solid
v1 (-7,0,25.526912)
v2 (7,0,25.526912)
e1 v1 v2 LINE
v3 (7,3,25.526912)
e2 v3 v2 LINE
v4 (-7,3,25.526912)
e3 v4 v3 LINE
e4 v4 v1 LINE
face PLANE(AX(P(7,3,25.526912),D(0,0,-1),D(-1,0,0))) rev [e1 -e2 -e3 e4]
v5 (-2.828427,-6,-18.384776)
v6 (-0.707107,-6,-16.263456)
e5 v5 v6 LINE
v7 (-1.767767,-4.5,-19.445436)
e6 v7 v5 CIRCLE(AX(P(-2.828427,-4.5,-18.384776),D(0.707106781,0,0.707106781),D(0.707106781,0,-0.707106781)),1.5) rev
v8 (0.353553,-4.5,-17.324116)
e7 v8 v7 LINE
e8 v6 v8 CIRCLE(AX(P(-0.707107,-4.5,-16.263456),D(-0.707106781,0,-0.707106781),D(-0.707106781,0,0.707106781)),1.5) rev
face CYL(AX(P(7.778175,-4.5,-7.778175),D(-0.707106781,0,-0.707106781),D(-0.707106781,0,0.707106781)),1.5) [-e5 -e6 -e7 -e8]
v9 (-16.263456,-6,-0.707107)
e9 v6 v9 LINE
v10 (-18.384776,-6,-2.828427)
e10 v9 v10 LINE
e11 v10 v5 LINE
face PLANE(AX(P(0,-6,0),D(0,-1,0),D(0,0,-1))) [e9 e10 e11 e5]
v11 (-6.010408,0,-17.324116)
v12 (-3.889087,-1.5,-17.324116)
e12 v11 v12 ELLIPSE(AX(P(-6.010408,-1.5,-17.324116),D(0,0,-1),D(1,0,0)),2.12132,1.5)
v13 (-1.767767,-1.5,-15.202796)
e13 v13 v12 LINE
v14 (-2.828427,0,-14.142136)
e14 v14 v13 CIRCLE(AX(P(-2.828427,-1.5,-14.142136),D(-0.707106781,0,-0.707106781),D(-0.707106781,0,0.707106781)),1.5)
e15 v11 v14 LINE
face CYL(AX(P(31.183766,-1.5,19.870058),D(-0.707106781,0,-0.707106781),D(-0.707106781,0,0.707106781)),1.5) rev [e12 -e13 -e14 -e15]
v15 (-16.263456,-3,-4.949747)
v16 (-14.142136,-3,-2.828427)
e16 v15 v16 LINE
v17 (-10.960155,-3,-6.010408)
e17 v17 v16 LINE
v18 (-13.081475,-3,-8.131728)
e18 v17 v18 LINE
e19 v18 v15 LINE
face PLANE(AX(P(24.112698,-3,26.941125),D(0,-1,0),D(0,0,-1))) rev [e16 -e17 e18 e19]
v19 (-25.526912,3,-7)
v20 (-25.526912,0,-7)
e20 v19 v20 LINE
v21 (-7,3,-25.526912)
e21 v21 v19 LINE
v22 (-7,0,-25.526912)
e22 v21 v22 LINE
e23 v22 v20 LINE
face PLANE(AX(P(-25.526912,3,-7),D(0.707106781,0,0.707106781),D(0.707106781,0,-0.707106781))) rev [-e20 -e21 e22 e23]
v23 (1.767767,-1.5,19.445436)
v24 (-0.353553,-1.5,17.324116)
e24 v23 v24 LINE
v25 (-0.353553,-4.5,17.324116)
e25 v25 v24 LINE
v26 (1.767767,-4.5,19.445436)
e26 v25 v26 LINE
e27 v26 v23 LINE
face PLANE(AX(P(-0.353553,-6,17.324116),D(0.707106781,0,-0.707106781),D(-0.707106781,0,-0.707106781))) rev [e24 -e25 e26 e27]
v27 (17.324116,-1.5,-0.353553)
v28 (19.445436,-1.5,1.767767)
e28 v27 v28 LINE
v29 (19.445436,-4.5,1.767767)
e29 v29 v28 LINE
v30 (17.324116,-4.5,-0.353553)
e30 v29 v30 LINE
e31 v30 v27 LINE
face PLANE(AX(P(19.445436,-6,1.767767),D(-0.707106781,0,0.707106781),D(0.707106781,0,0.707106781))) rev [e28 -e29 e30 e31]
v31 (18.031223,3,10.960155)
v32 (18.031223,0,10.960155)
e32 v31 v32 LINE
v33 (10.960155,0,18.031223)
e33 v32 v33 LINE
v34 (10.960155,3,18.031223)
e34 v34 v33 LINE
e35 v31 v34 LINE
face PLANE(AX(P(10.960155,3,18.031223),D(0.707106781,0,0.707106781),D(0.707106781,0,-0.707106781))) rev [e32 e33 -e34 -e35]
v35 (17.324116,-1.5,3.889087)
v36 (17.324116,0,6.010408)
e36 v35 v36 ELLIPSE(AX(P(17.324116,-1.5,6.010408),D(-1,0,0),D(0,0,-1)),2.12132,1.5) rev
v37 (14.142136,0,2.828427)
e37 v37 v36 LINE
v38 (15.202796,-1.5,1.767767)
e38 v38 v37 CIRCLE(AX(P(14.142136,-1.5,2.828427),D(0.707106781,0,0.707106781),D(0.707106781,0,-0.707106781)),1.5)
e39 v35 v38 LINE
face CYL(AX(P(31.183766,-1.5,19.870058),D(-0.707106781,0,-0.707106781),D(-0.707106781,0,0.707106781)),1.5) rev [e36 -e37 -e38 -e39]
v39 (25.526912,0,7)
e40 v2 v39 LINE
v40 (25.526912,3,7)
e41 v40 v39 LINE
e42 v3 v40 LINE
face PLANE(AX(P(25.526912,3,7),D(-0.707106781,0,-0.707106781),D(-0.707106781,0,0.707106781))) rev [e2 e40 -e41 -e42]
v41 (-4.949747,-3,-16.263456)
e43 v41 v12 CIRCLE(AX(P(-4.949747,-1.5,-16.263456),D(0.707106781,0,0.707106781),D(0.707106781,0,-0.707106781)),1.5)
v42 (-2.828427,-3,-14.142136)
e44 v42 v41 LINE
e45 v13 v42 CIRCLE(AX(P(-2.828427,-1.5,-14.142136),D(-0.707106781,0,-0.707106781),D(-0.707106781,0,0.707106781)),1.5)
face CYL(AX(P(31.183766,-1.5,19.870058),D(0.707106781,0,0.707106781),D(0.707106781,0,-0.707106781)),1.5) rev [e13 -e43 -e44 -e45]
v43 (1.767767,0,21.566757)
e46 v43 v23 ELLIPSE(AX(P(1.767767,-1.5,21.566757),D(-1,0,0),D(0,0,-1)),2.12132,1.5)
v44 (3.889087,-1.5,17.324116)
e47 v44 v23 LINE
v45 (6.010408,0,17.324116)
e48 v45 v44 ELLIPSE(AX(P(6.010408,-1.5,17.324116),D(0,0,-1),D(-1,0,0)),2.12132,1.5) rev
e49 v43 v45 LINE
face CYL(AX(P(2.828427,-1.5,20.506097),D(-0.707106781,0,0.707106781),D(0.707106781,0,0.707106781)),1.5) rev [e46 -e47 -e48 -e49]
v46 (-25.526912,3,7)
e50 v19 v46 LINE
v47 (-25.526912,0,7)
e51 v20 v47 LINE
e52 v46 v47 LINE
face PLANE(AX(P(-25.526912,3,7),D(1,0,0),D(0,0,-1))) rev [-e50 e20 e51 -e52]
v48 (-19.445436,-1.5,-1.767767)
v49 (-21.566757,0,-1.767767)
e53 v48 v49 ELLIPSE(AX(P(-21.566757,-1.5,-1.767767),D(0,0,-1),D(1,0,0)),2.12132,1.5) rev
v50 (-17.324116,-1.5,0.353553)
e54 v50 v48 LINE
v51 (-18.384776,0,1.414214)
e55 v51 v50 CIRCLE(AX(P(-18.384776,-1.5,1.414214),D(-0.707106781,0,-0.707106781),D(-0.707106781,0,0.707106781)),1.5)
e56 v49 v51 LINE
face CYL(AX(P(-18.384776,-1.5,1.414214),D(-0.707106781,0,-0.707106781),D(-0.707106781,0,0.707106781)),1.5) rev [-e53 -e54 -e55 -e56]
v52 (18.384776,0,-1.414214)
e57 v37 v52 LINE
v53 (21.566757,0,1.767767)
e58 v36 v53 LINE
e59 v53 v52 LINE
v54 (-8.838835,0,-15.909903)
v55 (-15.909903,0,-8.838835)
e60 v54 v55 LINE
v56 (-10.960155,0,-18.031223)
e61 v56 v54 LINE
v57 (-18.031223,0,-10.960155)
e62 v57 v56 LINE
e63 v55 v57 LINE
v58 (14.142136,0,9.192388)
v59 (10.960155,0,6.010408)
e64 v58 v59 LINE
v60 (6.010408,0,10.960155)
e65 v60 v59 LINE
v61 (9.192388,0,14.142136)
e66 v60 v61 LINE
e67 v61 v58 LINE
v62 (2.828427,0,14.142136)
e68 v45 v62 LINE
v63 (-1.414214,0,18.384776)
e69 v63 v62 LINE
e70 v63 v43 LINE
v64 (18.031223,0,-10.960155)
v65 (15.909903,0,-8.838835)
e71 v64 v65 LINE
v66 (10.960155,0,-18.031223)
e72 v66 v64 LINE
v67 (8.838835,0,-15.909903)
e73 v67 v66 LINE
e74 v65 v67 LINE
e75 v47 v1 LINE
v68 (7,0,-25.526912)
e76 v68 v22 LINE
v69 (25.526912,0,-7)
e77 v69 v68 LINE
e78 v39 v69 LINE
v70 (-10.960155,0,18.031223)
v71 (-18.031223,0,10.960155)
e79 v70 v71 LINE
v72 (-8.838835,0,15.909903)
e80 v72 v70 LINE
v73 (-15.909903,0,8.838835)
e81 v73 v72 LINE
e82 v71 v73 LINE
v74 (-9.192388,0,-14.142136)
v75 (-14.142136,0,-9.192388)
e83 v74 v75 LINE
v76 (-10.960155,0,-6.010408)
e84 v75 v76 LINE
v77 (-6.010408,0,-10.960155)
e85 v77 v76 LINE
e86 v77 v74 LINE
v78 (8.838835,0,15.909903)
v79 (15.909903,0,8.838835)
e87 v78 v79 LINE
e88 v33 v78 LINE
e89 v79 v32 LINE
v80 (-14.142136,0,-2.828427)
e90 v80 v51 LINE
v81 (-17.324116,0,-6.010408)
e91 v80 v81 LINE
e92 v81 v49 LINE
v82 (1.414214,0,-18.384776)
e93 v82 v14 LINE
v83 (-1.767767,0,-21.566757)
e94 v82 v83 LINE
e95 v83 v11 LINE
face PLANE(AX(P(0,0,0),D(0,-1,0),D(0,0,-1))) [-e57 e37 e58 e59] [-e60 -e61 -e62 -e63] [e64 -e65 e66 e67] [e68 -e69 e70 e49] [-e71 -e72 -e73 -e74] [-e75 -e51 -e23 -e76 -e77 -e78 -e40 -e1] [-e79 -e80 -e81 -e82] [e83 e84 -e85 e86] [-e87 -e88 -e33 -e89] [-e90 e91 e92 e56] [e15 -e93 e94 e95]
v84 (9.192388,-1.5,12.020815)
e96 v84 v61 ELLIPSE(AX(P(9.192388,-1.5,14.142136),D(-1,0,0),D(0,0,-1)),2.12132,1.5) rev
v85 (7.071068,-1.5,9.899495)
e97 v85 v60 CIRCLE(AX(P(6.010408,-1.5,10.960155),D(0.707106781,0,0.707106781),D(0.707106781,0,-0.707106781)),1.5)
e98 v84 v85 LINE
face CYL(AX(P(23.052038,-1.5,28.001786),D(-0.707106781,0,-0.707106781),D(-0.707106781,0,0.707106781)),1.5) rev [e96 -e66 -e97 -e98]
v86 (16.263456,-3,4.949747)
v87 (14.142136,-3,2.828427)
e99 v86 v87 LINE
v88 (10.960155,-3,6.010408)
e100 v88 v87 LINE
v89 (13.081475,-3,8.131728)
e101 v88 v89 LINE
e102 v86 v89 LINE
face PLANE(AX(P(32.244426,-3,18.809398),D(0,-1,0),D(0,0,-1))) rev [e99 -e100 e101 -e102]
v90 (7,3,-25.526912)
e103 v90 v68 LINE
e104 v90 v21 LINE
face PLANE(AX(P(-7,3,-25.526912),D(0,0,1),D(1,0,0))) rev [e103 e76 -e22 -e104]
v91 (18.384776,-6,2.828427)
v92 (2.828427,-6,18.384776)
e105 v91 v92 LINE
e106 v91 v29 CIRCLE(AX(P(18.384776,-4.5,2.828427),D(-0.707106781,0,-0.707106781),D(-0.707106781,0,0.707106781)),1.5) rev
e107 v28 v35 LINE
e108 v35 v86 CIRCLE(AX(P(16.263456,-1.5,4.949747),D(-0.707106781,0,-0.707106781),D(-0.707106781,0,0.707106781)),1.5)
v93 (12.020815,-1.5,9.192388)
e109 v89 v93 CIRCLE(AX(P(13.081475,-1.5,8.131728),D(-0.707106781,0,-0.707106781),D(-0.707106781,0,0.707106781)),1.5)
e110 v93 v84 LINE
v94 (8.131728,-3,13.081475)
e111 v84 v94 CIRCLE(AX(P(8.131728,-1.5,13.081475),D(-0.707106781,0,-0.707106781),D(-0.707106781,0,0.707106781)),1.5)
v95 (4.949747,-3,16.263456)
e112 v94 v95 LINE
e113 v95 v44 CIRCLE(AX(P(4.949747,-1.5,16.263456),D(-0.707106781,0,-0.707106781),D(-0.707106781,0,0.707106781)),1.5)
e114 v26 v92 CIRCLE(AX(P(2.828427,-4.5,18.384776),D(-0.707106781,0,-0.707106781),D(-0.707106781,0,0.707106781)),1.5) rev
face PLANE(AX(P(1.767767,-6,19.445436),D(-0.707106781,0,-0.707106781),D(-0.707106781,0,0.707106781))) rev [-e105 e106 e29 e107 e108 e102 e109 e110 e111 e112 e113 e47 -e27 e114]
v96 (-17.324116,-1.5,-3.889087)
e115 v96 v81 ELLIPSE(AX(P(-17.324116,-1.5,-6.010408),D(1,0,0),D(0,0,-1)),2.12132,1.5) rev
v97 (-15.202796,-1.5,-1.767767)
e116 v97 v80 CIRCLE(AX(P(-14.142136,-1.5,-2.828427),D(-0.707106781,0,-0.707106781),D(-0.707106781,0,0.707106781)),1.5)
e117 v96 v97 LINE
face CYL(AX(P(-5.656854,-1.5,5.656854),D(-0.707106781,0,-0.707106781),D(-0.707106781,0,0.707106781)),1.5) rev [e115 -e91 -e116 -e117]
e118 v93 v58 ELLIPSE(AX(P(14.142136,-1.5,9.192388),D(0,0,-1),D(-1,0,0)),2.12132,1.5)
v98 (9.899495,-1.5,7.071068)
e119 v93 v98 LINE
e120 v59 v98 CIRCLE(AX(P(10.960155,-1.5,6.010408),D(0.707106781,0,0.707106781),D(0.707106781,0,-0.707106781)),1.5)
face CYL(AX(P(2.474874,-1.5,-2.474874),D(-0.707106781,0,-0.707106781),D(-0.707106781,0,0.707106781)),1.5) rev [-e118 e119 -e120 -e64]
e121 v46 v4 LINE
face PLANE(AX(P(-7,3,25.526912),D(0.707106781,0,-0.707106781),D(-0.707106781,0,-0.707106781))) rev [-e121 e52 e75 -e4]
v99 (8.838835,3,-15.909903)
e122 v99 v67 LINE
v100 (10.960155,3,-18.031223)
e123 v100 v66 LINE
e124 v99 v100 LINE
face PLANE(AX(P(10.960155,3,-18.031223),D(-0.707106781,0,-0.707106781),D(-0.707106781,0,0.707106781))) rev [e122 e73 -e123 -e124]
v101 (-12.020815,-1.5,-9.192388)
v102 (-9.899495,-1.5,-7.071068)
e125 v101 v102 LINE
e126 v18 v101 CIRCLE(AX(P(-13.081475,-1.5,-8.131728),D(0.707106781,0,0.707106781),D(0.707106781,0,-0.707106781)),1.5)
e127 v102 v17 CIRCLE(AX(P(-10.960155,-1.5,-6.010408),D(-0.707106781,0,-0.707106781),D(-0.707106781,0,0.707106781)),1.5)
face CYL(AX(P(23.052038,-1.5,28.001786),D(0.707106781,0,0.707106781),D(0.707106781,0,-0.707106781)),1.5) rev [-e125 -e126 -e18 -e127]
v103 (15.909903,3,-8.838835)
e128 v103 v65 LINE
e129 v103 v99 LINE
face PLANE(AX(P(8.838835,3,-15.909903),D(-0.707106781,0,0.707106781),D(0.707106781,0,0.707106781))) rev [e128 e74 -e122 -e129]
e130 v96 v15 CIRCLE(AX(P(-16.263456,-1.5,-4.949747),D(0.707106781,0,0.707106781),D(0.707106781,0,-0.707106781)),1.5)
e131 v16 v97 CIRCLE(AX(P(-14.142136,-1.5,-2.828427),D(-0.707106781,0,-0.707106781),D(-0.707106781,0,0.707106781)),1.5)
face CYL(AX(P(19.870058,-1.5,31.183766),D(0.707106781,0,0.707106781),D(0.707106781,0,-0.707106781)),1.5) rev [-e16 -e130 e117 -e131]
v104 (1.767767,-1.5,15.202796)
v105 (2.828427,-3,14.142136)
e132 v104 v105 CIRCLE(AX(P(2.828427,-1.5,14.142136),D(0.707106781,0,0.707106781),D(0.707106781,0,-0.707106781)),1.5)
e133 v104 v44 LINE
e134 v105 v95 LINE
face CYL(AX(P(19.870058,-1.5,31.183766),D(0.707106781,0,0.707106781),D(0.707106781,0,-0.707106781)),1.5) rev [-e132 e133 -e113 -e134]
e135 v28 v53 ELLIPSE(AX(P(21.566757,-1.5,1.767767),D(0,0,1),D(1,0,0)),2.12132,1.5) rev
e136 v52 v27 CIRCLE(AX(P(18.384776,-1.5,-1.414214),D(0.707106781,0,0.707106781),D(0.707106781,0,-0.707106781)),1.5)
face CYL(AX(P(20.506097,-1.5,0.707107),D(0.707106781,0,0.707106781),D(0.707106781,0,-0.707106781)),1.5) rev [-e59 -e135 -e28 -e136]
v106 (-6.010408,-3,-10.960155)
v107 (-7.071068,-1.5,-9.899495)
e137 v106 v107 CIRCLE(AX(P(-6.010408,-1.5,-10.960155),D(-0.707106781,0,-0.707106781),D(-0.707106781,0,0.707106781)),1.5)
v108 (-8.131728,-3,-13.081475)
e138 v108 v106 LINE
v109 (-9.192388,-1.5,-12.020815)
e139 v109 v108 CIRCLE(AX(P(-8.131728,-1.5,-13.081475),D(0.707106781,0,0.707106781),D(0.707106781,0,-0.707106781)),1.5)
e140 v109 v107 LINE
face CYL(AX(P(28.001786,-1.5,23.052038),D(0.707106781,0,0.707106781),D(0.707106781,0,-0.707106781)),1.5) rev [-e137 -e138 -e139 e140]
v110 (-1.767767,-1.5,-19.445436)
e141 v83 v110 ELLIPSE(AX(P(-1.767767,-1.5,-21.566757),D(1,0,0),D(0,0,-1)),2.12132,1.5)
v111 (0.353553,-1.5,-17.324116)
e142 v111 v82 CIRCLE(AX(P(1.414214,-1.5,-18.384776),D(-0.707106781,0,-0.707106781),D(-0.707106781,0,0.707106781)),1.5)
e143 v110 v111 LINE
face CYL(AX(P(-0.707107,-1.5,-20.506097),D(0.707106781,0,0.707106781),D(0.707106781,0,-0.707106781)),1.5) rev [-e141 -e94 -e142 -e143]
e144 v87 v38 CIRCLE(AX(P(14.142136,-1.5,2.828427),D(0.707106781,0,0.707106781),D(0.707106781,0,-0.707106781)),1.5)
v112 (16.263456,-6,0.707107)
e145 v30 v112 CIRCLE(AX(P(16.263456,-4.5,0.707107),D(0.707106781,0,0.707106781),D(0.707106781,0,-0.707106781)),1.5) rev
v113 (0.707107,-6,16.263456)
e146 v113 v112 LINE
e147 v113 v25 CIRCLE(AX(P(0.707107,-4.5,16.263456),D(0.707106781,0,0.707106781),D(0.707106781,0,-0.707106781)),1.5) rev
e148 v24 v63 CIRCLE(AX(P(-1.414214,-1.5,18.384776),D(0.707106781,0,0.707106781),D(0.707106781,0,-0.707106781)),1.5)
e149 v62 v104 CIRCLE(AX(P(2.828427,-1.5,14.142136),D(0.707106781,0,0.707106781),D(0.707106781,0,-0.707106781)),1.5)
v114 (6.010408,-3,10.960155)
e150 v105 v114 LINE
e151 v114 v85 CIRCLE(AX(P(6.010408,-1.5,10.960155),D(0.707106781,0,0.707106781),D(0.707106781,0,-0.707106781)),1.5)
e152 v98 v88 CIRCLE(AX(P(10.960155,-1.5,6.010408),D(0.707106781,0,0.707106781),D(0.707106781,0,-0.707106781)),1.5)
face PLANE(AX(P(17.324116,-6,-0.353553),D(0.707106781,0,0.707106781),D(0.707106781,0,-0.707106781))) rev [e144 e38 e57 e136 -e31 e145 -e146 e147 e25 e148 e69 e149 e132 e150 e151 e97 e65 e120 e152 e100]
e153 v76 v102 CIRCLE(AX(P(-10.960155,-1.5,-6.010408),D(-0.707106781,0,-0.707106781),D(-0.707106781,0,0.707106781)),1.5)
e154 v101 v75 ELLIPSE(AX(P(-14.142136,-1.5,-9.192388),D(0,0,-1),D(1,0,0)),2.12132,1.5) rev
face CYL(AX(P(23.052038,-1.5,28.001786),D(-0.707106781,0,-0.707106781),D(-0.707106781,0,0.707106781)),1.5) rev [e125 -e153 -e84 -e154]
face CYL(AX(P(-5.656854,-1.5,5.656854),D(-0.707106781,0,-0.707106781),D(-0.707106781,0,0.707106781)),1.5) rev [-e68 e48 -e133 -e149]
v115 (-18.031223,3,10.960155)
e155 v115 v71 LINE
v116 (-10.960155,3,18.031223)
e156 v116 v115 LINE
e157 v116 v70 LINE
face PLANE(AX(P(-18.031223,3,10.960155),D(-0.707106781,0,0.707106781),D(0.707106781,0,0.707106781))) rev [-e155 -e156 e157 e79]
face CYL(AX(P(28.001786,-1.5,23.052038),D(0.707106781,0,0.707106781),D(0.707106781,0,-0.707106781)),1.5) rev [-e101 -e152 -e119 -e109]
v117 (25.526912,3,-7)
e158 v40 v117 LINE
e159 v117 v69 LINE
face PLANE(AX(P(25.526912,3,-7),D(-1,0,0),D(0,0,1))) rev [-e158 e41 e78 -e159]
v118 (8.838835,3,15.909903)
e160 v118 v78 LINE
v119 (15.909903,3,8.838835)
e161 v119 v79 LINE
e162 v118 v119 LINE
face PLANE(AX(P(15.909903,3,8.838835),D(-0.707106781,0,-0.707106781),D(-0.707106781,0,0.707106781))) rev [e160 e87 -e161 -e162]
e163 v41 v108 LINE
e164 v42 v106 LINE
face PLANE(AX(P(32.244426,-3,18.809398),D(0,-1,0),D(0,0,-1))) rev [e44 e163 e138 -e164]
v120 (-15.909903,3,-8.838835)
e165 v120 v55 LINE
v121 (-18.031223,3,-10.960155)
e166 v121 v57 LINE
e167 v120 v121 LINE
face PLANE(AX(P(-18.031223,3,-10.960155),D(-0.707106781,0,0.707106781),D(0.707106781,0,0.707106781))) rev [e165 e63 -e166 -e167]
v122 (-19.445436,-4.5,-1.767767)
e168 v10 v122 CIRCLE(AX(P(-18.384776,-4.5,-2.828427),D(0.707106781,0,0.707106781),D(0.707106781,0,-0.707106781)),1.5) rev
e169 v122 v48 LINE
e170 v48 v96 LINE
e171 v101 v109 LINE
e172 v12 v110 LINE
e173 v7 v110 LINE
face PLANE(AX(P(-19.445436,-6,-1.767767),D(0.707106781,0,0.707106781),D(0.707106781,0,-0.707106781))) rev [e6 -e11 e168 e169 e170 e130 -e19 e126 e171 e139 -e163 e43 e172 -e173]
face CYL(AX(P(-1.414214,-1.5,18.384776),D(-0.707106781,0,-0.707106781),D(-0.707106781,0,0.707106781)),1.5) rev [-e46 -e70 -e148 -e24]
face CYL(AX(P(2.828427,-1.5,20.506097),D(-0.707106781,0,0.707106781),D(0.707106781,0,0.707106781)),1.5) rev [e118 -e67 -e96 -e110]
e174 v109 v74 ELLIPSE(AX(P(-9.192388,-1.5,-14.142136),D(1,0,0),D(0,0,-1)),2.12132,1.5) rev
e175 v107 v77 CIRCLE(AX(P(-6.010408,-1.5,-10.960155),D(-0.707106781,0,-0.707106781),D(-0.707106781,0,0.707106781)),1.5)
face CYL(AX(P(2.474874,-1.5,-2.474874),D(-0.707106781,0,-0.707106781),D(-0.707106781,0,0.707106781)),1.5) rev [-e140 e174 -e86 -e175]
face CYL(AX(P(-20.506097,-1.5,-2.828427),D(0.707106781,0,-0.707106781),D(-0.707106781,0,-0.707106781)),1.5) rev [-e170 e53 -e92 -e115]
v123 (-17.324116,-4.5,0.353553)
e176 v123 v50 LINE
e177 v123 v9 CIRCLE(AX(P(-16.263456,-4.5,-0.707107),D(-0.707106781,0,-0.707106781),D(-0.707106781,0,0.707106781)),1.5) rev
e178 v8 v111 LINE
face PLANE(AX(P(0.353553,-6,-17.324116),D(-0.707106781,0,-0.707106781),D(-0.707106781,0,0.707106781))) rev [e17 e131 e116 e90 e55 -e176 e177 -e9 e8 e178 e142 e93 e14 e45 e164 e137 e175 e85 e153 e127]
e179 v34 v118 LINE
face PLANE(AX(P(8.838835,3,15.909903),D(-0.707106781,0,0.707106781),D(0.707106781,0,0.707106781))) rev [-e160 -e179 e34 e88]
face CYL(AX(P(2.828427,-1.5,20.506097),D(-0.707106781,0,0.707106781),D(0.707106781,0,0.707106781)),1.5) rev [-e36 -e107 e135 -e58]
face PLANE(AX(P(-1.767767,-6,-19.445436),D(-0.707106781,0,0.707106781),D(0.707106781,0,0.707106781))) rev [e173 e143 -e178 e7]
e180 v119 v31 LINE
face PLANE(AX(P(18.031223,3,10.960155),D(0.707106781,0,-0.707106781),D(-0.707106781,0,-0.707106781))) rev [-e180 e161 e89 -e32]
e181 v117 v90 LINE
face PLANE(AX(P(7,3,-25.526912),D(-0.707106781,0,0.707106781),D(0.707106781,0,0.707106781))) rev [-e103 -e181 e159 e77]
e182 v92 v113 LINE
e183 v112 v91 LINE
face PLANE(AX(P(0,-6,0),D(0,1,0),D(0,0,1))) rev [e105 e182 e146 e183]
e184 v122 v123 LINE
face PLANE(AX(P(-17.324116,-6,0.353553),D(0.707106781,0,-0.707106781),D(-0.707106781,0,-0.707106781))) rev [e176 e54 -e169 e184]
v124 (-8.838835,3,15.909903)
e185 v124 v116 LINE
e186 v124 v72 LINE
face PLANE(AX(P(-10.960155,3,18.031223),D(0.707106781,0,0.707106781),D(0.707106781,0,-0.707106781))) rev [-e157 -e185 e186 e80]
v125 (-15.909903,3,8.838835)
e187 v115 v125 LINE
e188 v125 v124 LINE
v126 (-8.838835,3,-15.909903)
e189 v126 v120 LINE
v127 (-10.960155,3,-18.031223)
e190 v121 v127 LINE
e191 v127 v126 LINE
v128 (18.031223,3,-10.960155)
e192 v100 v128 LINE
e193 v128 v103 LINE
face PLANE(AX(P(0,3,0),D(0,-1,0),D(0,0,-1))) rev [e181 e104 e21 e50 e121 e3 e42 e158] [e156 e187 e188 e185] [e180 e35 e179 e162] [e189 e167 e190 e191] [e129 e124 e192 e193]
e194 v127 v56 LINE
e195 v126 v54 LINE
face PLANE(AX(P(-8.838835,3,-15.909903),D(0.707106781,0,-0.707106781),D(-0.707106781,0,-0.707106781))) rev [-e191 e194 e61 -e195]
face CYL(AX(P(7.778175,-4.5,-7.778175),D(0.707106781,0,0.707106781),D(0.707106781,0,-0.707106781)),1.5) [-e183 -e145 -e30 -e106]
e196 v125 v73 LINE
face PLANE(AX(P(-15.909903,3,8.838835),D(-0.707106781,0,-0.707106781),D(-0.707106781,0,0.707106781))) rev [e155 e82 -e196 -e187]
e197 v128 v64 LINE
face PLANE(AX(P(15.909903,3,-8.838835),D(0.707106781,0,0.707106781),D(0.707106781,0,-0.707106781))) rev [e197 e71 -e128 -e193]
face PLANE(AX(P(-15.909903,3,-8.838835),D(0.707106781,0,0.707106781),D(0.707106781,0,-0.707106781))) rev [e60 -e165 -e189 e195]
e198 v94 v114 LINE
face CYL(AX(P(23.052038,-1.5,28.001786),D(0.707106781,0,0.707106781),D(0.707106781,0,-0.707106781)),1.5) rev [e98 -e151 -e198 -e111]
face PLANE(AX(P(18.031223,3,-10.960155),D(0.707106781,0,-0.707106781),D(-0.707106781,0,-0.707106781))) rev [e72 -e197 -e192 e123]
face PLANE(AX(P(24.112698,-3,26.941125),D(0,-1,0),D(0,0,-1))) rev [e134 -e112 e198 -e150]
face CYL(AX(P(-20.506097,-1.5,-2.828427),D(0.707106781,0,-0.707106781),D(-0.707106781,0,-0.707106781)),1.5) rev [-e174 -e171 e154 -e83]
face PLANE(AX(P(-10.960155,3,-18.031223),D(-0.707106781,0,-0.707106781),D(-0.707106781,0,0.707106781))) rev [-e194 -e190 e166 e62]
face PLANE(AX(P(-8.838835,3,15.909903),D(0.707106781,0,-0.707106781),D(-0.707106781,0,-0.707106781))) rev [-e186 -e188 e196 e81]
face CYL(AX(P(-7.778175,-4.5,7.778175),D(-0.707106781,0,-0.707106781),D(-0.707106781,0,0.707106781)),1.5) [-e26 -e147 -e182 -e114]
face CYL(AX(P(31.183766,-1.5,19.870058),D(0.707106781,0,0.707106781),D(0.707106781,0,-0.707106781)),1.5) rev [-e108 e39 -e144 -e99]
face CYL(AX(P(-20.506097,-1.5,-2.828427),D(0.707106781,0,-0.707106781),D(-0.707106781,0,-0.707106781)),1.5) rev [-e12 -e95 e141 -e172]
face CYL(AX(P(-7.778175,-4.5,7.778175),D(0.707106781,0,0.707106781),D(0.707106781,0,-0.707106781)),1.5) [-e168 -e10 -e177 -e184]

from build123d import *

# Parameters (mm, degrees)
MAIN_PLATE_DEPTH                 = 3
TOP_PLATE_CONNECTOR_HOLES_DEPTH  = 37.224942593
ZIPTIE_STRUCTURE_DEPTH           = 6
SKETCH5_W                        = 7.5
SKETCH5_H                        = 3
ZIPTIE_HOLES_DEPTH               = 52.45154631
REMOVING_STRESS_CONCENTRATIONS_R = 1.5


with BuildPart() as part:
    # Sketch1 → Main Plate (new body)
    with BuildSketch(Plane(origin=(0, 0, 0), x_dir=(1, 0, 0), z_dir=(0, 1, 0))):
        Polygon((-7, 25.526911935), (7, 25.526911935), (25.526911935, 7), (25.526911935, -7), (7, -25.526911935), (-7, -25.526911935), (-25.526911935, -7), (-25.526911935, 7), align=None)
    extrude(amount=MAIN_PLATE_DEPTH)

    # Sketch2 → Top Plate Connector Holes (cut, through all)
    with BuildSketch(Plane.XZ):
        Polygon((10.960155108, 18.03122292), (18.03122292, 10.960155108), (15.909902577, 8.838834765), (8.838834765, 15.909902577), align=None)
        Polygon((8.838834765, -15.909902577), (15.909902577, -8.838834765), (18.03122292, -10.960155108), (10.960155108, -18.03122292), align=None)
        Polygon((-15.909902577, -8.838834765), (-8.838834765, -15.909902577), (-10.960155108, -18.03122292), (-18.03122292, -10.960155108), align=None)
        Polygon((-8.838834765, 15.909902577), (-15.909902577, 8.838834765), (-18.03122292, 10.960155108), (-10.960155108, 18.03122292), align=None)
    extrude(amount=-TOP_PLATE_CONNECTOR_HOLES_DEPTH, mode=Mode.SUBTRACT)

    # Sketch3 → ZipTie Structure (add)
    with BuildSketch(Plane.XZ):
        Polygon((1.767766953, 19.445436483), (19.445436483, 1.767766953), (17.324116139, -0.353553391), (-0.353553391, 17.324116139), align=None)
        Polygon((-1.767766953, -19.445436483), (0.353553391, -17.324116139), (-17.324116139, 0.353553391), (-19.445436483, -1.767766953), align=None)
    extrude(amount=ZIPTIE_STRUCTURE_DEPTH)

    # Sketch5 → ZipTie Holes (cut, through all)
    with BuildSketch(Plane(origin=(-10.606601718, 0, -10.606601718), x_dir=(-0.7071067811865475, 0, 0.7071067811865477), z_dir=(-0.7071067811865477, 0, -0.7071067811865475))):
        with Locations((-5.75, -1.5)):
            Rectangle(SKETCH5_W, SKETCH5_H)
        with Locations((5.75, -1.5)):
            Rectangle(SKETCH5_W, SKETCH5_H)
    extrude(amount=-ZIPTIE_HOLES_DEPTH, mode=Mode.SUBTRACT)

    # Removing Stress Concentrations
    removing_stress_concentrations_edges = [part.edges().sort_by_distance(p)[0] for p in [
        (8.131727984, -3, 10.960155108),
        (10.960155108, -3, 8.131727984),
        (16.263455967, -3, 2.828427125),
        (-2.828427125, -3, -16.263455967),
        (-8.131727984, -3, -10.960155108),
        (-10.960155108, -3, -8.131727984),
        (-16.263455967, -3, -2.828427125),
        (2.828427125, -3, 16.263455967),
        (-16.263455967, 0, -2.828427125),
        (-8.131727984, 0, -10.960155108),
        (-0.707106781, 0, -18.384776311),
        (2.828427125, 0, 18.384776311),
        (10.606601718, 0, 10.606601718),
        (18.384776311, 0, 2.828427125),
        (10.960155108, 0, 8.131727984),
        (2.828427125, 0, 16.263455967),
        (0.707106781, -6, 18.384776311),
        (18.384776311, -6, 0.707106781),
        (18.384776311, 0, 0.707106781),
        (16.263455967, 0, 2.828427125),
        (0.707106781, 0, 18.384776311),
        (8.131727984, 0, 10.960155108),
        (-18.384776311, 0, -0.707106781),
        (-2.828427125, 0, -16.263455967),
        (-10.960155108, 0, -8.131727984),
        (-2.828427125, 0, -18.384776311),
        (-10.606601718, 0, -10.606601718),
        (-18.384776311, 0, -2.828427125),
        (-18.384776311, -6, -0.707106781),
        (-0.707106781, -6, -18.384776311),
    ]]
    fillet(removing_stress_concentrations_edges, radius=REMOVING_STRESS_CONCENTRATIONS_R - 0.0001)  # a hair under: the kernel refuses the full size


solid = part.part
